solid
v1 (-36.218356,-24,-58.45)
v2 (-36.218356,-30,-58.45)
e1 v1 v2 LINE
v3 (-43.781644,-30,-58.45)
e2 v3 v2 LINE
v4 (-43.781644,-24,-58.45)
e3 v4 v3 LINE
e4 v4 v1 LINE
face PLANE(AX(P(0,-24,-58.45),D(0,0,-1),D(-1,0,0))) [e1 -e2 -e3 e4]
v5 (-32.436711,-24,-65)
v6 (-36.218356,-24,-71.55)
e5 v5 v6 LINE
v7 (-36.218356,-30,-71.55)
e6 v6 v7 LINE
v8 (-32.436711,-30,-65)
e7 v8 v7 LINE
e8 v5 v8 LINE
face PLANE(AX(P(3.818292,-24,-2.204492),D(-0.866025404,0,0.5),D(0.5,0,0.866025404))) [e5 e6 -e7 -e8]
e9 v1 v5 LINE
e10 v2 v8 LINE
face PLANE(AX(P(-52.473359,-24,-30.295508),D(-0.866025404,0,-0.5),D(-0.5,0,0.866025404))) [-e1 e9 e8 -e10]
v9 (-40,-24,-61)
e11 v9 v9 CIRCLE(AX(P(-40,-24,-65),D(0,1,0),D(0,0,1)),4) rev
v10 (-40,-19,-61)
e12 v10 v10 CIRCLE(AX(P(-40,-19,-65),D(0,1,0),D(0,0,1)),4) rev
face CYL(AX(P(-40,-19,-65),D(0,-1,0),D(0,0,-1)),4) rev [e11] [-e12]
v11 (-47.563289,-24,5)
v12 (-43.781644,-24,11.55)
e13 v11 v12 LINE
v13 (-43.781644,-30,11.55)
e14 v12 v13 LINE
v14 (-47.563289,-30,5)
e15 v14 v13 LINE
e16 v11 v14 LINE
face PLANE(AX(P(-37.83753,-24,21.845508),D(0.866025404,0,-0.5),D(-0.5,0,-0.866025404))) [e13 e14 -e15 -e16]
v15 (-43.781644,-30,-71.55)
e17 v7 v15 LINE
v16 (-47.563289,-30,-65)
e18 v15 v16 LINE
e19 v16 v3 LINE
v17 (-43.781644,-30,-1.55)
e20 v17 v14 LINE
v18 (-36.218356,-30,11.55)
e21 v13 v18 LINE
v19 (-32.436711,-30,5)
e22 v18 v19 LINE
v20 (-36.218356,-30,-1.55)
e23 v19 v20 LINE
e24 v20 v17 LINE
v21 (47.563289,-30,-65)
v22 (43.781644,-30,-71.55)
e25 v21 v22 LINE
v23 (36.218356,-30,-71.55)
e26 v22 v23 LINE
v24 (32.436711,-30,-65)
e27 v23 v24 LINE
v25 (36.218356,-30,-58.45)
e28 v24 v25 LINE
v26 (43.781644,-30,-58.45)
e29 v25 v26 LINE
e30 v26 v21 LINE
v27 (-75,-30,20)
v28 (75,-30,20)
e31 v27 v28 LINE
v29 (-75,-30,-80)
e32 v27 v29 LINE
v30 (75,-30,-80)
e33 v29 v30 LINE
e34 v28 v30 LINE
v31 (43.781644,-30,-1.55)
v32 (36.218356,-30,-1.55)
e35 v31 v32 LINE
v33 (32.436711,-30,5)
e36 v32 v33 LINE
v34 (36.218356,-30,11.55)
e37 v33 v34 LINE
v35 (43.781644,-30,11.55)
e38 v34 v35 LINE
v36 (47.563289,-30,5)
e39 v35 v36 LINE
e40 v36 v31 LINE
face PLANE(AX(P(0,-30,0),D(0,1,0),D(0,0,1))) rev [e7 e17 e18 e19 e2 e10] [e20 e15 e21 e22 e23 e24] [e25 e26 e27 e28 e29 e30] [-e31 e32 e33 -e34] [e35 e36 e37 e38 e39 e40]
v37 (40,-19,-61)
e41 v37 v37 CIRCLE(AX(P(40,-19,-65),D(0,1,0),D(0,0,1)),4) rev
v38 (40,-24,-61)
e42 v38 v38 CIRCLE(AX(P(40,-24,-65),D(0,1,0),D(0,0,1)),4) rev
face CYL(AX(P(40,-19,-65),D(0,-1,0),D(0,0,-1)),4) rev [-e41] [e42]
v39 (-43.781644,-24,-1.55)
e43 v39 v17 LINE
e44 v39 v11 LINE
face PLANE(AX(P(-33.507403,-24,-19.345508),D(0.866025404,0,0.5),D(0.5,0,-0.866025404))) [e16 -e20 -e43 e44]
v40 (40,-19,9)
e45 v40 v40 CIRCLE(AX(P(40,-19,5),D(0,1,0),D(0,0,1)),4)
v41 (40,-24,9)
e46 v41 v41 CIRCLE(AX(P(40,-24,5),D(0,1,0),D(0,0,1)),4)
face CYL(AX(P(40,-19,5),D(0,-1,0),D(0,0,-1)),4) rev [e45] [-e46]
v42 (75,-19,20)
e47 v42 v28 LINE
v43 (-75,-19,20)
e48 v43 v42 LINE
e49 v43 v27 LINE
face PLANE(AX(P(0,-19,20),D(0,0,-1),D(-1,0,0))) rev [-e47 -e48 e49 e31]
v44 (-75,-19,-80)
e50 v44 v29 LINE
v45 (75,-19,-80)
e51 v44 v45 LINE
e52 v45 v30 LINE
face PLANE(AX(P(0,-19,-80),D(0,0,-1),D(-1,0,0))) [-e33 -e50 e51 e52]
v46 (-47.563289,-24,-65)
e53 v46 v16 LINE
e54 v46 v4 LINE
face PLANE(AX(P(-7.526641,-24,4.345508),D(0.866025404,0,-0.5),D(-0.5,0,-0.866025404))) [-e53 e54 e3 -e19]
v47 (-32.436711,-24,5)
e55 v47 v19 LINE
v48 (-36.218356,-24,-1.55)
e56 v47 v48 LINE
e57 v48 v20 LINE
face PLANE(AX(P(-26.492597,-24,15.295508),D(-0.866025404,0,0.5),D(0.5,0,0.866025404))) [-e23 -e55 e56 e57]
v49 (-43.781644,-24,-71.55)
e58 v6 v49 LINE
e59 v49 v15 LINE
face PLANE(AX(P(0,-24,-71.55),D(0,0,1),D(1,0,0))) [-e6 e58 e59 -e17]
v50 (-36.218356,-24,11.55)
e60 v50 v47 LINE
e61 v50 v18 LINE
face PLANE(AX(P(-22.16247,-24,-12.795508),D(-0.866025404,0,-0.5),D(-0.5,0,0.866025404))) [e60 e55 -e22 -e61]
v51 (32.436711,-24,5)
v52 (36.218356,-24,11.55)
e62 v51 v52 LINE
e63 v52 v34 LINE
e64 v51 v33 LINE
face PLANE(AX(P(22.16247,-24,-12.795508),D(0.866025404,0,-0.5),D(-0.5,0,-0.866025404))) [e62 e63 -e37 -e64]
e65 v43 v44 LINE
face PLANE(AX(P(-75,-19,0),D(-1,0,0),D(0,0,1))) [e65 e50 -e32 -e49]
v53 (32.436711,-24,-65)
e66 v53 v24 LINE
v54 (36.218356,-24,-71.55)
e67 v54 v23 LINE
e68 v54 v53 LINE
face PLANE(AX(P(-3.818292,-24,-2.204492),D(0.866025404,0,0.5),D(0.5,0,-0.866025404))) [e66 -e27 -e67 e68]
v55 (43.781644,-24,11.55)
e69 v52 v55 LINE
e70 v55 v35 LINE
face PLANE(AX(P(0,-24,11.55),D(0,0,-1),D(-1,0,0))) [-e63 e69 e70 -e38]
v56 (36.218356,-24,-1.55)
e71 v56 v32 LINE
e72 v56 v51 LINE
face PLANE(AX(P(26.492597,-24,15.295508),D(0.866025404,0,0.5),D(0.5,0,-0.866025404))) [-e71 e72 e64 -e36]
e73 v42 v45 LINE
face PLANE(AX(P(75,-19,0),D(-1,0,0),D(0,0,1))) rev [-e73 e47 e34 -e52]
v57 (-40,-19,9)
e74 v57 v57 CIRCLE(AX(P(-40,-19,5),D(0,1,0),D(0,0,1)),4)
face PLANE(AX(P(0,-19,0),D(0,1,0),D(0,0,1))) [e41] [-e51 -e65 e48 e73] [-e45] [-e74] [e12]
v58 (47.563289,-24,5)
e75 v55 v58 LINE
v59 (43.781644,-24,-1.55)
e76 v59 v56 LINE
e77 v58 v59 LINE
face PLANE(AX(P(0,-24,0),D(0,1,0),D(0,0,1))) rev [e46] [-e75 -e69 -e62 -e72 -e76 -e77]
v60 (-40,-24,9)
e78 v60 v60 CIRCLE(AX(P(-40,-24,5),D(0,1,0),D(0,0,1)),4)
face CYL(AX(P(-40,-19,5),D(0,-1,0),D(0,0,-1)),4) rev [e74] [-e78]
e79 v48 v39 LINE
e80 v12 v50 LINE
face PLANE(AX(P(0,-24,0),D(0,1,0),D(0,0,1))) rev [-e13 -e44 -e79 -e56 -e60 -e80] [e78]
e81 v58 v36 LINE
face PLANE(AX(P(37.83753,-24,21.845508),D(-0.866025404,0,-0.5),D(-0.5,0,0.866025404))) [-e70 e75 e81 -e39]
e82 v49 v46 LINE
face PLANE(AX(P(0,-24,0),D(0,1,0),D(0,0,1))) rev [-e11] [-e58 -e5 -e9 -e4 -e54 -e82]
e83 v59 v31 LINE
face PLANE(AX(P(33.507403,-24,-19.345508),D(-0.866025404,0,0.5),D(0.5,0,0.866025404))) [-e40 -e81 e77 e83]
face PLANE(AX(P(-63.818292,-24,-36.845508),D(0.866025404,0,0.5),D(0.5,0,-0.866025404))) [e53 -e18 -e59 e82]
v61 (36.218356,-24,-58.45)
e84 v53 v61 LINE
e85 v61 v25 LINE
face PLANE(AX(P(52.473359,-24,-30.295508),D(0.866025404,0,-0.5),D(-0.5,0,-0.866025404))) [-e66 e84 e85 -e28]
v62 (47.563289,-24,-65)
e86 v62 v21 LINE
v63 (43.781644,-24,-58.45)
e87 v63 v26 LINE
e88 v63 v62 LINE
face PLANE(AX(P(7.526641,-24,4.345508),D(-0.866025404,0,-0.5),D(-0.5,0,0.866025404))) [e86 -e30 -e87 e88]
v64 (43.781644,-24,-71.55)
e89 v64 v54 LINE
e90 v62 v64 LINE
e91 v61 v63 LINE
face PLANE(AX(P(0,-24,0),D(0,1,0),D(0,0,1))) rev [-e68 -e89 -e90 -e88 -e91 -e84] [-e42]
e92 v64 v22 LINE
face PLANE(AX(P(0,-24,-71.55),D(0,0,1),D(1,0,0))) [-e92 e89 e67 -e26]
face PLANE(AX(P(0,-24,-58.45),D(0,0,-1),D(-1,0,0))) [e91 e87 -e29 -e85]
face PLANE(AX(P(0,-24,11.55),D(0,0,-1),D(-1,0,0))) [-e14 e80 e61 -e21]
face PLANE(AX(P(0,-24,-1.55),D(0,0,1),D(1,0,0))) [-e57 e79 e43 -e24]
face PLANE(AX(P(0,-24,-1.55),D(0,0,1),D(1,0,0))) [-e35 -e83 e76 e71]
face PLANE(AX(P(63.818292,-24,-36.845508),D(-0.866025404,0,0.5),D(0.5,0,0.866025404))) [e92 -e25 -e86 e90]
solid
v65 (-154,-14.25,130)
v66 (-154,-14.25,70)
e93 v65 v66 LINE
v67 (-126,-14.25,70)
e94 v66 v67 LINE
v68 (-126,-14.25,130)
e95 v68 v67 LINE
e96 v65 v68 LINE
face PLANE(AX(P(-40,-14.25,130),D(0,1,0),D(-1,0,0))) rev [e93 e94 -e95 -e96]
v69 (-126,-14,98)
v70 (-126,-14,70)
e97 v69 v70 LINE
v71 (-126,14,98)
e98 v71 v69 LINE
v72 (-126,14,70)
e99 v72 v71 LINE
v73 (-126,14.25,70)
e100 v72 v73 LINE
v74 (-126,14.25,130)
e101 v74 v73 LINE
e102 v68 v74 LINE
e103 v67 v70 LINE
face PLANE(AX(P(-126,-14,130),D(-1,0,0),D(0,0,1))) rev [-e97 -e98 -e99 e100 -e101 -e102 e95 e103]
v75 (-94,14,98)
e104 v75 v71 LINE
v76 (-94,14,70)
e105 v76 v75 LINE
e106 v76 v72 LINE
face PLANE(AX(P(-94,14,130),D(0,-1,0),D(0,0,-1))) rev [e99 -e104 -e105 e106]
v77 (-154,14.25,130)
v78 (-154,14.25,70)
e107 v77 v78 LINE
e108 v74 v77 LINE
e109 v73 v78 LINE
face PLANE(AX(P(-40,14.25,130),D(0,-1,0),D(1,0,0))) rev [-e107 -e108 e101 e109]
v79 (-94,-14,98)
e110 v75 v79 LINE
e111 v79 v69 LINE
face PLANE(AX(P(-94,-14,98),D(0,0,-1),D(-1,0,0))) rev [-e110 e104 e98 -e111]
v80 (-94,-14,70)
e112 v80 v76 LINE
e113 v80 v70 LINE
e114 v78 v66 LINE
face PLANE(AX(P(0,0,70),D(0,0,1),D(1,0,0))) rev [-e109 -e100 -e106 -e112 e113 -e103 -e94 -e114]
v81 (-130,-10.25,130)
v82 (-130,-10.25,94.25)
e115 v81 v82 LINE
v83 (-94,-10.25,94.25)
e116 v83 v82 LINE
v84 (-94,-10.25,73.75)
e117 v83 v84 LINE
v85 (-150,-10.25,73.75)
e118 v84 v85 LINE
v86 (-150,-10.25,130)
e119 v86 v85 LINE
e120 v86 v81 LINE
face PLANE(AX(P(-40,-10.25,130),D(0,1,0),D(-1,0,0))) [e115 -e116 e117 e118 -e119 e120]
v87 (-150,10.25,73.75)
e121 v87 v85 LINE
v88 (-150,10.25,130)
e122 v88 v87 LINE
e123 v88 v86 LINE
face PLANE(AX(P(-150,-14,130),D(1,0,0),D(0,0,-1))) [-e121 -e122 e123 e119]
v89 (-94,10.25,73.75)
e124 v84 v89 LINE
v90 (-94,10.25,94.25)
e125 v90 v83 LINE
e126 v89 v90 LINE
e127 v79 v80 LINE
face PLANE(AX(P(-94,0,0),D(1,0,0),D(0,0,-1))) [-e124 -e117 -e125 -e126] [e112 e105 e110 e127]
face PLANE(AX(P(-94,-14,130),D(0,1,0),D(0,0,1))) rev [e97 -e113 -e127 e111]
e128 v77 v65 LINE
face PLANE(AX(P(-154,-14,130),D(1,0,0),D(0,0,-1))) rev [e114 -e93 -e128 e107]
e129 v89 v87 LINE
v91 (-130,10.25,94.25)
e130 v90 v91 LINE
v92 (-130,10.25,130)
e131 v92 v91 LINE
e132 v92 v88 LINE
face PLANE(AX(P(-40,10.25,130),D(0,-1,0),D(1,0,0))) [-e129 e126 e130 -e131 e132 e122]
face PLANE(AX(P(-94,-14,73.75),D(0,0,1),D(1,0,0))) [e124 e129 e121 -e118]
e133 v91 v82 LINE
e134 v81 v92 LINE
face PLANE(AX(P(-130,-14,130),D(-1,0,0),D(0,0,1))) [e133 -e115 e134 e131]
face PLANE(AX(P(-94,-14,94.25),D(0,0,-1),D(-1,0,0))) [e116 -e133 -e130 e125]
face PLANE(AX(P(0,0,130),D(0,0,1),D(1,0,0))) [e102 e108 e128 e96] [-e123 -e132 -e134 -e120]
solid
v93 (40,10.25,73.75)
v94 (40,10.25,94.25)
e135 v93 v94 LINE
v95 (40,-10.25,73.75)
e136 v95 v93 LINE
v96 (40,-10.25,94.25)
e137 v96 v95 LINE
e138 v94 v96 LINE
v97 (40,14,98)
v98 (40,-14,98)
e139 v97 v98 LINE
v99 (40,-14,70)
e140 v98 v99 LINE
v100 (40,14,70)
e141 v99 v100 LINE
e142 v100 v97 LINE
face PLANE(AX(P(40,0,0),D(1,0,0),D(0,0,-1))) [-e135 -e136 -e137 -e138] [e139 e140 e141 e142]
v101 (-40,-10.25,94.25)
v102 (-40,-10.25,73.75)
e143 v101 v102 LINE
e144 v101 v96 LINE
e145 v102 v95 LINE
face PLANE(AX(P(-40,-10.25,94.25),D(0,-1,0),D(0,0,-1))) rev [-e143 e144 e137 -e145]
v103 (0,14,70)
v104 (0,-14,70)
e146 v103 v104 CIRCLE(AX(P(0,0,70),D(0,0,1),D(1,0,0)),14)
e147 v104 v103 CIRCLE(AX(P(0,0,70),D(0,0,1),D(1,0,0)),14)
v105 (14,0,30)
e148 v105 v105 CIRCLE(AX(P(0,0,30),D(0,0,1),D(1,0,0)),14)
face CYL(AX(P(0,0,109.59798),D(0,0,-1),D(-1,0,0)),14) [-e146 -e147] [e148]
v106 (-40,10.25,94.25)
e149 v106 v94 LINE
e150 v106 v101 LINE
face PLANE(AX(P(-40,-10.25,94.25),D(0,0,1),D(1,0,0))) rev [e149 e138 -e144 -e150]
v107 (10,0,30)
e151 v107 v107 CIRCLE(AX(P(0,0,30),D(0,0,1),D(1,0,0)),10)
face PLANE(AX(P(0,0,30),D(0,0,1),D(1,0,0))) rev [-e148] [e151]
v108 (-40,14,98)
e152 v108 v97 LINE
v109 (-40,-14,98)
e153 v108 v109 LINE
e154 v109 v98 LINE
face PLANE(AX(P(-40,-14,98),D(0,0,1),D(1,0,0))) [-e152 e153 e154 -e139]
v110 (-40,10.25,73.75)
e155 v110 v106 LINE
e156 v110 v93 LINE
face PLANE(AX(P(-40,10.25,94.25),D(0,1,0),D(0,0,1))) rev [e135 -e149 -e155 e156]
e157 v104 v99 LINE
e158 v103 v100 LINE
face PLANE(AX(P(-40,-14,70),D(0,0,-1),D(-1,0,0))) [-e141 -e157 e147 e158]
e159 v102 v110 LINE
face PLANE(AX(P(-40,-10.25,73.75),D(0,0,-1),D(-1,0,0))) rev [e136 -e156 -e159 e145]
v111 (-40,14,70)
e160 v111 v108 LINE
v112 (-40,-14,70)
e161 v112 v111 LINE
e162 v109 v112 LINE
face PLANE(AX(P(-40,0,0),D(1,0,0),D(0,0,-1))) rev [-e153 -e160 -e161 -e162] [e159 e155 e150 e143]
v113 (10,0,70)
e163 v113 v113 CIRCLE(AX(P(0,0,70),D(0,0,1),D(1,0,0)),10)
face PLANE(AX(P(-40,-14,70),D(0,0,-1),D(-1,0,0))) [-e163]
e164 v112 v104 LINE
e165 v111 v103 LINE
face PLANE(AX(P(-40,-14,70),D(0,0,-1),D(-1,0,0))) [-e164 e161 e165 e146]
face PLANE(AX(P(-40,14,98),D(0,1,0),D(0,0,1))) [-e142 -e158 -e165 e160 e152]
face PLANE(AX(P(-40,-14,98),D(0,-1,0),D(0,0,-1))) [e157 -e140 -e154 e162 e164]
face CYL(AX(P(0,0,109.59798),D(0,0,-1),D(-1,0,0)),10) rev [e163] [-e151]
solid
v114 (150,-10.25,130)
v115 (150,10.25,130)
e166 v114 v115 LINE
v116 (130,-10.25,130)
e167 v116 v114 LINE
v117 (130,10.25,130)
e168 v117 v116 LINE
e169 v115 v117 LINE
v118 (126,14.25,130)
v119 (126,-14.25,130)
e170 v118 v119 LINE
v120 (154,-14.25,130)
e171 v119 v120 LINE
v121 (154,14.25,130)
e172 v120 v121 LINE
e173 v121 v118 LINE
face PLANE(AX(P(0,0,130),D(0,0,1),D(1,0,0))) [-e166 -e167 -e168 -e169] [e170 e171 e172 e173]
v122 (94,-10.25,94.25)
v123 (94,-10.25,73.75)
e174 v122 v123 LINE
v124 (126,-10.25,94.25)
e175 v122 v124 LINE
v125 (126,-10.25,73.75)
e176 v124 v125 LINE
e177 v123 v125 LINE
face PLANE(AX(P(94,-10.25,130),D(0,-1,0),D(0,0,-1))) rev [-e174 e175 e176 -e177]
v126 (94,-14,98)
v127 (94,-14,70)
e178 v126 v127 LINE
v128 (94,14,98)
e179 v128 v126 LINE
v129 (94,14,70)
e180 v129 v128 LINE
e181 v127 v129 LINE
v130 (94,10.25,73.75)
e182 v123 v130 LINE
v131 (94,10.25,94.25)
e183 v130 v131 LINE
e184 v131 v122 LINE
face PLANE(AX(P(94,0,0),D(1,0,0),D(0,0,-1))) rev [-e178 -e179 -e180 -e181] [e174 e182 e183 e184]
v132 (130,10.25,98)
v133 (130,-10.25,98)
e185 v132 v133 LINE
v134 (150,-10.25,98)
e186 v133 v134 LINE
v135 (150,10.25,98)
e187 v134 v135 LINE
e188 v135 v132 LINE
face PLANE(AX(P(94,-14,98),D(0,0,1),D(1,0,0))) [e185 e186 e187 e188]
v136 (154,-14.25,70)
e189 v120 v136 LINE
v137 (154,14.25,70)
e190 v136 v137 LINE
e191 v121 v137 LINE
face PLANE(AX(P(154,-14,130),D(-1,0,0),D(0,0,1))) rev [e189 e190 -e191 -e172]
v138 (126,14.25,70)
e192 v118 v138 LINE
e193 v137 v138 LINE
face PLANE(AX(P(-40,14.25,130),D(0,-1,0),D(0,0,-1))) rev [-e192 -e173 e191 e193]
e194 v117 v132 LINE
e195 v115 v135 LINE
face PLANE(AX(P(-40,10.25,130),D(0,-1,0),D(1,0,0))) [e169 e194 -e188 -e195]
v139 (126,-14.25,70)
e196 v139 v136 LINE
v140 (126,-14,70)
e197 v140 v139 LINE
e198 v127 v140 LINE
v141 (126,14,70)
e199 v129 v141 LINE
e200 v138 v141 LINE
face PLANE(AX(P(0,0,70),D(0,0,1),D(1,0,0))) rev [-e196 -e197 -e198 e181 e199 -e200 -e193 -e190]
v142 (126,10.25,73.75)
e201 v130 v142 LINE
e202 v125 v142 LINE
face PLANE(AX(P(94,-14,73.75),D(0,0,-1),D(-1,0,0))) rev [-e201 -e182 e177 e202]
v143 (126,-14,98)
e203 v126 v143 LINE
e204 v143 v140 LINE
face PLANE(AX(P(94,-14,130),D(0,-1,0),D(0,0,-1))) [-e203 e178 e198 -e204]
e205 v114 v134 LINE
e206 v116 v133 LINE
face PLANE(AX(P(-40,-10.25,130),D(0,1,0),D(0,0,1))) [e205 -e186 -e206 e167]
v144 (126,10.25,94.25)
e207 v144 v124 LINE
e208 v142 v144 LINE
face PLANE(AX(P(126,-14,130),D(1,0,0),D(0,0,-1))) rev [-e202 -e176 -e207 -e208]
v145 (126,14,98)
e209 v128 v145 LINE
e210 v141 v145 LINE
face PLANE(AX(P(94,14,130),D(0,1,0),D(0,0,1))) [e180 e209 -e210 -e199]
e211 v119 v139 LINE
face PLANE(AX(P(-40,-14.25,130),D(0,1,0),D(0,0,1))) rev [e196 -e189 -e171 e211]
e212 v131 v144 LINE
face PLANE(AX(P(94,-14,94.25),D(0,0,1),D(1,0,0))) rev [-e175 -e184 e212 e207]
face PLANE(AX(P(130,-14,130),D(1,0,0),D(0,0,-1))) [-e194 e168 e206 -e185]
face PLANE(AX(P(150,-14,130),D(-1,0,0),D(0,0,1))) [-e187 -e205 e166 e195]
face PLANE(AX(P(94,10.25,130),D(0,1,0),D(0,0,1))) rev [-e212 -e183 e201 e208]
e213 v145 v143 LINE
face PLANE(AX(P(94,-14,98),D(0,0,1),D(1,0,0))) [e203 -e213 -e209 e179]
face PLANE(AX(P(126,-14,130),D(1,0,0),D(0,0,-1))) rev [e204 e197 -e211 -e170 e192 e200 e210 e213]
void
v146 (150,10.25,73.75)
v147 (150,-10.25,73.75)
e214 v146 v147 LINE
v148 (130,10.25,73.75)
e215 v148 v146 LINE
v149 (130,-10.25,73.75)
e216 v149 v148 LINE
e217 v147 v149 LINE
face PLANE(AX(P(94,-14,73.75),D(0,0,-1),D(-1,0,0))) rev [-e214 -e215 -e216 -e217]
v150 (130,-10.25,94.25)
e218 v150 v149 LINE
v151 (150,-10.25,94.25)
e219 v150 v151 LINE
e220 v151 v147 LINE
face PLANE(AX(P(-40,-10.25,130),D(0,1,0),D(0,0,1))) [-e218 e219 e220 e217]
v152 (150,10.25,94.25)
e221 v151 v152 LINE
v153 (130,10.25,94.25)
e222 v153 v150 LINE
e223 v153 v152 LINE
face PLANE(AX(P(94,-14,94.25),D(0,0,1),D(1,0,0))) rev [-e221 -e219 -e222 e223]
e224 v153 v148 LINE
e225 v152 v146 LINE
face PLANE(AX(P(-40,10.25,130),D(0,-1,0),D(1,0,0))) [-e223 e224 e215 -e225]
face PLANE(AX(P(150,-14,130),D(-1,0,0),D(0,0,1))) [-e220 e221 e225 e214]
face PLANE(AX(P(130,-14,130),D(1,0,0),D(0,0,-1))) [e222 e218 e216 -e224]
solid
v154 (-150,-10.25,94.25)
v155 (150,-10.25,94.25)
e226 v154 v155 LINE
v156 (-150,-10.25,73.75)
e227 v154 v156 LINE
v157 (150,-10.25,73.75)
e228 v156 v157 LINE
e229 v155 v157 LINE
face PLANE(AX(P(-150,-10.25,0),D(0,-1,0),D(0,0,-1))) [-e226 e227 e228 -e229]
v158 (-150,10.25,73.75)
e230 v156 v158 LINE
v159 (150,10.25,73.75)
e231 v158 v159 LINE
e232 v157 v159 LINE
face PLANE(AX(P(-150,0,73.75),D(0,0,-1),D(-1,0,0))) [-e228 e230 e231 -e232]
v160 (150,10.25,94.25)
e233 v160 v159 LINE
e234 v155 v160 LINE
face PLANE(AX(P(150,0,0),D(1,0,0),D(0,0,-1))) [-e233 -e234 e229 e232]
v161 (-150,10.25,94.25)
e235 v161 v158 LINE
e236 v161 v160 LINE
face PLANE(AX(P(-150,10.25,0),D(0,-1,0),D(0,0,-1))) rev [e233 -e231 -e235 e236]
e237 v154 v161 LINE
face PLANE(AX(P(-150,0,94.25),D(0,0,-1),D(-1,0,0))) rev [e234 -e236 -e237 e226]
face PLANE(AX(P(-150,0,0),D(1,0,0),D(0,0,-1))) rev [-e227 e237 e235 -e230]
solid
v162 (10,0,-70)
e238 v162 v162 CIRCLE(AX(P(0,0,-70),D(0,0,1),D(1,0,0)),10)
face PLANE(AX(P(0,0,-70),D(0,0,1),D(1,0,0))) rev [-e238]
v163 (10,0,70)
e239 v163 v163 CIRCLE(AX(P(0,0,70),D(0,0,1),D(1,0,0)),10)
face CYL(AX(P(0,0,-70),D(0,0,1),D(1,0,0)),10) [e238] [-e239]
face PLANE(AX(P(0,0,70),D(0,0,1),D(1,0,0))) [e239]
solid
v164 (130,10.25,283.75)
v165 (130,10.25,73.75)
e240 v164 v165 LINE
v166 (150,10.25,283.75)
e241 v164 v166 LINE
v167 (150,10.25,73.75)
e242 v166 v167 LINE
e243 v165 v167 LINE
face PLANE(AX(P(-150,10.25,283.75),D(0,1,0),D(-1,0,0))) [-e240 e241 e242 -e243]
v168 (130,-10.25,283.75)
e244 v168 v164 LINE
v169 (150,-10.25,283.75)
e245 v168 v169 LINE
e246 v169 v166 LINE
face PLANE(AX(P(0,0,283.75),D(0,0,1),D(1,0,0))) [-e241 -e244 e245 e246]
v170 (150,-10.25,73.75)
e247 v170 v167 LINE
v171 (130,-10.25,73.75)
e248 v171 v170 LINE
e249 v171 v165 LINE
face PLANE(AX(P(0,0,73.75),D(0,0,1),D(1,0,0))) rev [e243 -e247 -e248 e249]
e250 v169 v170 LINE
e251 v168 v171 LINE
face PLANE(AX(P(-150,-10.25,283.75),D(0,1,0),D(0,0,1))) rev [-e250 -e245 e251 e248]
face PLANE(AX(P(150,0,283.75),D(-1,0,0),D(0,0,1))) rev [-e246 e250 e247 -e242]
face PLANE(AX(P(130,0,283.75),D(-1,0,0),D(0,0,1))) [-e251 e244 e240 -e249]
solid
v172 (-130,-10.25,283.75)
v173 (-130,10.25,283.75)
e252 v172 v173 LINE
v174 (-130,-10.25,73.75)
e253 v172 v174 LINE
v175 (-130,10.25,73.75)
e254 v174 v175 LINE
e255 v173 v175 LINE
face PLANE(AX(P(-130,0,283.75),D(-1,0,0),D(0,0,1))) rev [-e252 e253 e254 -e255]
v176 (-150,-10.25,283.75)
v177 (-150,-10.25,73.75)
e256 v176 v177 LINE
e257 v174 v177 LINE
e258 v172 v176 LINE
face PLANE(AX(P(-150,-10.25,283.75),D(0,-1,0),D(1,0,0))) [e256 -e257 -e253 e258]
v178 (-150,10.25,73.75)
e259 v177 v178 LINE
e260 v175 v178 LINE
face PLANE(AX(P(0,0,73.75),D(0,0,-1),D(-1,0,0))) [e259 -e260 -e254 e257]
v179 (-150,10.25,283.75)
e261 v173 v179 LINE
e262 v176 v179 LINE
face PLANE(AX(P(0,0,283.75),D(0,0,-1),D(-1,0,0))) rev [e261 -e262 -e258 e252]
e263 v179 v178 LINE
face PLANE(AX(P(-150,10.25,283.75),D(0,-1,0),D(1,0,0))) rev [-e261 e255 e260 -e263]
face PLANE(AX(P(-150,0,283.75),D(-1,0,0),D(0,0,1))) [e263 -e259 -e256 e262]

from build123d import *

# Parameters (mm, degrees)
SALIENTE_EXTRUIR1_DEPTH      = 70
SALIENTE_EXTRUIR1_DEPTH_BACK = 70
CROQUIS1_R                   = 10
SALIENTE_EXTRUIR2_START      = 30
CROQUIS2_R                   = 14
CROQUIS2_R_2                 = 10
SALIENTE_EXTRUIR2_DEPTH      = 40
SALIENTE_EXTRUIR3_DEPTH      = 150
SALIENTE_EXTRUIR3_DEPTH_BACK = 150
CROQUIS3_W                   = 20.5
CROQUIS3_H                   = 20.5
SALIENTE_EXTRUIR4_DEPTH      = 40
SALIENTE_EXTRUIR4_DEPTH_BACK = 40
CROQUIS3_3_W                 = 28
CROQUIS3_3_H                 = 28
CROQUIS3_3_W_2               = 20.5
CROQUIS3_3_H_2               = 20.5
SALIENTE_EXTRUIR5_START      = 73.75
CROQUIS4_W                   = 20
CROQUIS4_H                   = 20.5
SALIENTE_EXTRUIR5_DEPTH      = 210
SALIENTE_EXTRUIR5_2_DEPTH    = 210
SALIENTE_EXTRUIR6_START      = 70
CROQUIS4_3_W                 = 28
CROQUIS4_3_H                 = 28.5
CROQUIS4_3_W_2               = 20
CROQUIS4_3_H_2               = 20.5
SALIENTE_EXTRUIR6_DEPTH      = 60
SALIENTE_EXTRUIR6_2_DEPTH    = 60
SALIENTE_EXTRUIR7_START      = -154
CROQUIS3_4_W                 = 28
CROQUIS3_4_H                 = 28
CROQUIS3_4_W_2               = 20.5
CROQUIS3_4_H_2               = 20.5
SALIENTE_EXTRUIR7_DEPTH      = 60
SALIENTE_EXTRUIR8_START      = 154
CROQUIS3_5_W                 = 28
CROQUIS3_5_H                 = 28
CROQUIS3_5_W_2               = 20.5
CROQUIS3_5_H_2               = 20.5
SALIENTE_EXTRUIR8_DEPTH      = 60
SALIENTE_EXTRUIR9_START      = -30
CROQUIS5_W                   = 150
CROQUIS5_H                   = 100
CROQUIS5_R                   = 4
SALIENTE_EXTRUIR9_DEPTH      = 11
INDENTACI_N1_START           = -130
INDENTACI_N1_OUTLINE_W       = 20.5
INDENTACI_N1_OUTLINE_H       = 20.5
INDENTACI_N1_DEPTH           = 4
INDENTACI_N1_START_2         = -150
INDENTACI_N1_2_OUTLINE_W     = 20.5
INDENTACI_N1_2_OUTLINE_H     = 3.75
INDENTACI_N1_2_DEPTH         = 20
CORTAR_EXTRUIR1_START        = -30
CORTAR_EXTRUIR1_DEPTH        = 6


# Read off the part's stored shape, not the designer's step: Indentación1
with BuildPart() as part:
    # Croquis1 → Saliente-Extruir1 (new, two sides: drawn at the far end of the back side and taken through both)
    with BuildSketch(Plane.XY.offset(-SALIENTE_EXTRUIR1_DEPTH_BACK)):
        Circle(CROQUIS1_R)
    extrude(amount=SALIENTE_EXTRUIR1_DEPTH + SALIENTE_EXTRUIR1_DEPTH_BACK)


with BuildPart() as body_2:
    # Croquis2 → Saliente-Extruir2 (new body)
    with BuildSketch(Plane.XY.offset(SALIENTE_EXTRUIR2_START)):
        Circle(CROQUIS2_R)
        Circle(CROQUIS2_R_2, mode=Mode.SUBTRACT)
    extrude(amount=SALIENTE_EXTRUIR2_DEPTH)

    # Croquis3<3> → Saliente-Extruir4 (add, two sides: drawn at the far end of the back side and taken through both)
    with BuildSketch(Plane(origin=(0, 0, 0), x_dir=(0, 0, -1), z_dir=(1, 0, 0)).offset(-SALIENTE_EXTRUIR4_DEPTH_BACK)):
        with Locations((-84, 0)):
            Rectangle(CROQUIS3_3_W, CROQUIS3_3_H)
        with Locations((-84, 0)):
            Rectangle(CROQUIS3_3_W_2, CROQUIS3_3_H_2, mode=Mode.SUBTRACT)
    extrude(amount=SALIENTE_EXTRUIR4_DEPTH + SALIENTE_EXTRUIR4_DEPTH_BACK)


with BuildPart() as body_3:
    # Croquis3 → Saliente-Extruir3 (new, two sides: drawn at the far end of the back side and taken through both)
    with BuildSketch(Plane(origin=(0, 0, 0), x_dir=(0, 0, -1), z_dir=(1, 0, 0)).offset(-SALIENTE_EXTRUIR3_DEPTH_BACK)):
        with Locations((-84, 0)):
            Rectangle(CROQUIS3_W, CROQUIS3_H)
    extrude(amount=SALIENTE_EXTRUIR3_DEPTH + SALIENTE_EXTRUIR3_DEPTH_BACK)


with BuildPart() as body_4:
    # Croquis4 → Saliente-Extruir5 (new body)
    with BuildSketch(Plane.XY.offset(SALIENTE_EXTRUIR5_START)):
        with Locations((-140, 0)):
            Rectangle(CROQUIS4_W, CROQUIS4_H)
    extrude(amount=SALIENTE_EXTRUIR5_DEPTH)


with BuildPart() as body_5:
    # Croquis4 → Saliente-Extruir5 2 (new body)
    with BuildSketch(Plane.XY.offset(SALIENTE_EXTRUIR5_START)):
        with Locations((140, 0)):
            Rectangle(CROQUIS4_W, CROQUIS4_H)
    extrude(amount=SALIENTE_EXTRUIR5_2_DEPTH)


with BuildPart() as body_6:
    # Croquis4<3> → Saliente-Extruir6 (new body)
    with BuildSketch(Plane.XY.offset(SALIENTE_EXTRUIR6_START)):
        with Locations((-140, 0)):
            Rectangle(CROQUIS4_3_W, CROQUIS4_3_H)
        with Locations((-140, 0)):
            Rectangle(CROQUIS4_3_W_2, CROQUIS4_3_H_2, mode=Mode.SUBTRACT)
    extrude(amount=SALIENTE_EXTRUIR6_DEPTH)

    # Croquis3<4> → Saliente-Extruir7 (add)
    with BuildSketch(Plane(origin=(0, 0, 0), x_dir=(0, 0, -1), z_dir=(1, 0, 0)).offset(SALIENTE_EXTRUIR7_START)):
        with Locations((-84, 0)):
            Rectangle(CROQUIS3_4_W, CROQUIS3_4_H)
        with Locations((-84, 0)):
            Rectangle(CROQUIS3_4_W_2, CROQUIS3_4_H_2, mode=Mode.SUBTRACT)
    extrude(amount=SALIENTE_EXTRUIR7_DEPTH)

    # Indentación1 outline → Indentación1 (cut)
    with BuildSketch(Plane.YZ.offset(INDENTACI_N1_START)):
        with Locations((0, 84)):
            Rectangle(INDENTACI_N1_OUTLINE_W, INDENTACI_N1_OUTLINE_H)
    extrude(amount=INDENTACI_N1_DEPTH, mode=Mode.SUBTRACT)

    # Indentaci_n1 2 outline → Indentaci_n1 2 (cut)
    with BuildSketch(Plane.YZ.offset(INDENTACI_N1_START_2)):
        with Locations((0, 96.125)):
            Rectangle(INDENTACI_N1_2_OUTLINE_W, INDENTACI_N1_2_OUTLINE_H)
    extrude(amount=INDENTACI_N1_2_DEPTH, mode=Mode.SUBTRACT)


with BuildPart() as body_7:
    # Croquis4<3> → Saliente-Extruir6 2 (new body)
    with BuildSketch(Plane.XY.offset(SALIENTE_EXTRUIR6_START)):
        with Locations((140, 0)):
            Rectangle(CROQUIS4_3_W, CROQUIS4_3_H)
        with Locations((140, 0)):
            Rectangle(CROQUIS4_3_W_2, CROQUIS4_3_H_2, mode=Mode.SUBTRACT)
    extrude(amount=SALIENTE_EXTRUIR6_2_DEPTH)

    # Croquis3<5> → Saliente-Extruir8 (add)
    with BuildSketch(Plane(origin=(0, 0, 0), x_dir=(0, 0, -1), z_dir=(1, 0, 0)).offset(SALIENTE_EXTRUIR8_START)):
        with Locations((-84, 0)):
            Rectangle(CROQUIS3_5_W, CROQUIS3_5_H)
        with Locations((-84, 0)):
            Rectangle(CROQUIS3_5_W_2, CROQUIS3_5_H_2, mode=Mode.SUBTRACT)
    extrude(amount=-SALIENTE_EXTRUIR8_DEPTH)


with BuildPart() as body_8:
    # Croquis5 → Saliente-Extruir9 (new body)
    with BuildSketch(Plane(origin=(0, 0, 0), x_dir=(1, 0, 0), z_dir=(0, 1, 0)).offset(SALIENTE_EXTRUIR9_START)):
        with Locations((0, 30)):
            Rectangle(CROQUIS5_W, CROQUIS5_H)
        with Locations(Location((40, 65, 0), (0, 0, 270))):
            Circle(CROQUIS5_R, mode=Mode.SUBTRACT)
        with Locations(Location((40, -5, 0), (0, 0, 270))):
            Circle(CROQUIS5_R, mode=Mode.SUBTRACT)
        with Locations(Location((-40, -5, 0), (0, 0, 270))):
            Circle(CROQUIS5_R, mode=Mode.SUBTRACT)
        with Locations(Location((-40, 65, 0), (0, 0, 270))):
            Circle(CROQUIS5_R, mode=Mode.SUBTRACT)
    extrude(amount=SALIENTE_EXTRUIR9_DEPTH)

    # Croquis6 → Cortar-Extruir1 (cut)
    with BuildSketch(Plane(origin=(0, 0, 0), x_dir=(1, 0, 0), z_dir=(0, 1, 0)).offset(CORTAR_EXTRUIR1_START)):
        Polygon((-36.218355737, -11.55), (-32.436711474, -5), (-36.218355737, 1.55), (-43.781644263, 1.55), (-47.563288526, -5), (-43.781644263, -11.55), align=None)
        Polygon((47.563288526, -5), (43.781644263, -11.55), (36.218355737, -11.55), (32.436711474, -5), (36.218355737, 1.55), (43.781644263, 1.55), align=None)
        Polygon((36.218355737, 71.55), (32.436711474, 65), (36.218355737, 58.45), (43.781644263, 58.45), (47.563288526, 65), (43.781644263, 71.55), align=None)
        Polygon((-47.563288526, 65), (-43.781644263, 71.55), (-36.218355737, 71.55), (-32.436711474, 65), (-36.218355737, 58.45), (-43.781644263, 58.45), align=None)
    extrude(amount=CORTAR_EXTRUIR1_DEPTH, mode=Mode.SUBTRACT)


solid = Compound([part.part, body_2.part, body_3.part, body_4.part, body_5.part, body_6.part, body_7.part, body_8.part])
